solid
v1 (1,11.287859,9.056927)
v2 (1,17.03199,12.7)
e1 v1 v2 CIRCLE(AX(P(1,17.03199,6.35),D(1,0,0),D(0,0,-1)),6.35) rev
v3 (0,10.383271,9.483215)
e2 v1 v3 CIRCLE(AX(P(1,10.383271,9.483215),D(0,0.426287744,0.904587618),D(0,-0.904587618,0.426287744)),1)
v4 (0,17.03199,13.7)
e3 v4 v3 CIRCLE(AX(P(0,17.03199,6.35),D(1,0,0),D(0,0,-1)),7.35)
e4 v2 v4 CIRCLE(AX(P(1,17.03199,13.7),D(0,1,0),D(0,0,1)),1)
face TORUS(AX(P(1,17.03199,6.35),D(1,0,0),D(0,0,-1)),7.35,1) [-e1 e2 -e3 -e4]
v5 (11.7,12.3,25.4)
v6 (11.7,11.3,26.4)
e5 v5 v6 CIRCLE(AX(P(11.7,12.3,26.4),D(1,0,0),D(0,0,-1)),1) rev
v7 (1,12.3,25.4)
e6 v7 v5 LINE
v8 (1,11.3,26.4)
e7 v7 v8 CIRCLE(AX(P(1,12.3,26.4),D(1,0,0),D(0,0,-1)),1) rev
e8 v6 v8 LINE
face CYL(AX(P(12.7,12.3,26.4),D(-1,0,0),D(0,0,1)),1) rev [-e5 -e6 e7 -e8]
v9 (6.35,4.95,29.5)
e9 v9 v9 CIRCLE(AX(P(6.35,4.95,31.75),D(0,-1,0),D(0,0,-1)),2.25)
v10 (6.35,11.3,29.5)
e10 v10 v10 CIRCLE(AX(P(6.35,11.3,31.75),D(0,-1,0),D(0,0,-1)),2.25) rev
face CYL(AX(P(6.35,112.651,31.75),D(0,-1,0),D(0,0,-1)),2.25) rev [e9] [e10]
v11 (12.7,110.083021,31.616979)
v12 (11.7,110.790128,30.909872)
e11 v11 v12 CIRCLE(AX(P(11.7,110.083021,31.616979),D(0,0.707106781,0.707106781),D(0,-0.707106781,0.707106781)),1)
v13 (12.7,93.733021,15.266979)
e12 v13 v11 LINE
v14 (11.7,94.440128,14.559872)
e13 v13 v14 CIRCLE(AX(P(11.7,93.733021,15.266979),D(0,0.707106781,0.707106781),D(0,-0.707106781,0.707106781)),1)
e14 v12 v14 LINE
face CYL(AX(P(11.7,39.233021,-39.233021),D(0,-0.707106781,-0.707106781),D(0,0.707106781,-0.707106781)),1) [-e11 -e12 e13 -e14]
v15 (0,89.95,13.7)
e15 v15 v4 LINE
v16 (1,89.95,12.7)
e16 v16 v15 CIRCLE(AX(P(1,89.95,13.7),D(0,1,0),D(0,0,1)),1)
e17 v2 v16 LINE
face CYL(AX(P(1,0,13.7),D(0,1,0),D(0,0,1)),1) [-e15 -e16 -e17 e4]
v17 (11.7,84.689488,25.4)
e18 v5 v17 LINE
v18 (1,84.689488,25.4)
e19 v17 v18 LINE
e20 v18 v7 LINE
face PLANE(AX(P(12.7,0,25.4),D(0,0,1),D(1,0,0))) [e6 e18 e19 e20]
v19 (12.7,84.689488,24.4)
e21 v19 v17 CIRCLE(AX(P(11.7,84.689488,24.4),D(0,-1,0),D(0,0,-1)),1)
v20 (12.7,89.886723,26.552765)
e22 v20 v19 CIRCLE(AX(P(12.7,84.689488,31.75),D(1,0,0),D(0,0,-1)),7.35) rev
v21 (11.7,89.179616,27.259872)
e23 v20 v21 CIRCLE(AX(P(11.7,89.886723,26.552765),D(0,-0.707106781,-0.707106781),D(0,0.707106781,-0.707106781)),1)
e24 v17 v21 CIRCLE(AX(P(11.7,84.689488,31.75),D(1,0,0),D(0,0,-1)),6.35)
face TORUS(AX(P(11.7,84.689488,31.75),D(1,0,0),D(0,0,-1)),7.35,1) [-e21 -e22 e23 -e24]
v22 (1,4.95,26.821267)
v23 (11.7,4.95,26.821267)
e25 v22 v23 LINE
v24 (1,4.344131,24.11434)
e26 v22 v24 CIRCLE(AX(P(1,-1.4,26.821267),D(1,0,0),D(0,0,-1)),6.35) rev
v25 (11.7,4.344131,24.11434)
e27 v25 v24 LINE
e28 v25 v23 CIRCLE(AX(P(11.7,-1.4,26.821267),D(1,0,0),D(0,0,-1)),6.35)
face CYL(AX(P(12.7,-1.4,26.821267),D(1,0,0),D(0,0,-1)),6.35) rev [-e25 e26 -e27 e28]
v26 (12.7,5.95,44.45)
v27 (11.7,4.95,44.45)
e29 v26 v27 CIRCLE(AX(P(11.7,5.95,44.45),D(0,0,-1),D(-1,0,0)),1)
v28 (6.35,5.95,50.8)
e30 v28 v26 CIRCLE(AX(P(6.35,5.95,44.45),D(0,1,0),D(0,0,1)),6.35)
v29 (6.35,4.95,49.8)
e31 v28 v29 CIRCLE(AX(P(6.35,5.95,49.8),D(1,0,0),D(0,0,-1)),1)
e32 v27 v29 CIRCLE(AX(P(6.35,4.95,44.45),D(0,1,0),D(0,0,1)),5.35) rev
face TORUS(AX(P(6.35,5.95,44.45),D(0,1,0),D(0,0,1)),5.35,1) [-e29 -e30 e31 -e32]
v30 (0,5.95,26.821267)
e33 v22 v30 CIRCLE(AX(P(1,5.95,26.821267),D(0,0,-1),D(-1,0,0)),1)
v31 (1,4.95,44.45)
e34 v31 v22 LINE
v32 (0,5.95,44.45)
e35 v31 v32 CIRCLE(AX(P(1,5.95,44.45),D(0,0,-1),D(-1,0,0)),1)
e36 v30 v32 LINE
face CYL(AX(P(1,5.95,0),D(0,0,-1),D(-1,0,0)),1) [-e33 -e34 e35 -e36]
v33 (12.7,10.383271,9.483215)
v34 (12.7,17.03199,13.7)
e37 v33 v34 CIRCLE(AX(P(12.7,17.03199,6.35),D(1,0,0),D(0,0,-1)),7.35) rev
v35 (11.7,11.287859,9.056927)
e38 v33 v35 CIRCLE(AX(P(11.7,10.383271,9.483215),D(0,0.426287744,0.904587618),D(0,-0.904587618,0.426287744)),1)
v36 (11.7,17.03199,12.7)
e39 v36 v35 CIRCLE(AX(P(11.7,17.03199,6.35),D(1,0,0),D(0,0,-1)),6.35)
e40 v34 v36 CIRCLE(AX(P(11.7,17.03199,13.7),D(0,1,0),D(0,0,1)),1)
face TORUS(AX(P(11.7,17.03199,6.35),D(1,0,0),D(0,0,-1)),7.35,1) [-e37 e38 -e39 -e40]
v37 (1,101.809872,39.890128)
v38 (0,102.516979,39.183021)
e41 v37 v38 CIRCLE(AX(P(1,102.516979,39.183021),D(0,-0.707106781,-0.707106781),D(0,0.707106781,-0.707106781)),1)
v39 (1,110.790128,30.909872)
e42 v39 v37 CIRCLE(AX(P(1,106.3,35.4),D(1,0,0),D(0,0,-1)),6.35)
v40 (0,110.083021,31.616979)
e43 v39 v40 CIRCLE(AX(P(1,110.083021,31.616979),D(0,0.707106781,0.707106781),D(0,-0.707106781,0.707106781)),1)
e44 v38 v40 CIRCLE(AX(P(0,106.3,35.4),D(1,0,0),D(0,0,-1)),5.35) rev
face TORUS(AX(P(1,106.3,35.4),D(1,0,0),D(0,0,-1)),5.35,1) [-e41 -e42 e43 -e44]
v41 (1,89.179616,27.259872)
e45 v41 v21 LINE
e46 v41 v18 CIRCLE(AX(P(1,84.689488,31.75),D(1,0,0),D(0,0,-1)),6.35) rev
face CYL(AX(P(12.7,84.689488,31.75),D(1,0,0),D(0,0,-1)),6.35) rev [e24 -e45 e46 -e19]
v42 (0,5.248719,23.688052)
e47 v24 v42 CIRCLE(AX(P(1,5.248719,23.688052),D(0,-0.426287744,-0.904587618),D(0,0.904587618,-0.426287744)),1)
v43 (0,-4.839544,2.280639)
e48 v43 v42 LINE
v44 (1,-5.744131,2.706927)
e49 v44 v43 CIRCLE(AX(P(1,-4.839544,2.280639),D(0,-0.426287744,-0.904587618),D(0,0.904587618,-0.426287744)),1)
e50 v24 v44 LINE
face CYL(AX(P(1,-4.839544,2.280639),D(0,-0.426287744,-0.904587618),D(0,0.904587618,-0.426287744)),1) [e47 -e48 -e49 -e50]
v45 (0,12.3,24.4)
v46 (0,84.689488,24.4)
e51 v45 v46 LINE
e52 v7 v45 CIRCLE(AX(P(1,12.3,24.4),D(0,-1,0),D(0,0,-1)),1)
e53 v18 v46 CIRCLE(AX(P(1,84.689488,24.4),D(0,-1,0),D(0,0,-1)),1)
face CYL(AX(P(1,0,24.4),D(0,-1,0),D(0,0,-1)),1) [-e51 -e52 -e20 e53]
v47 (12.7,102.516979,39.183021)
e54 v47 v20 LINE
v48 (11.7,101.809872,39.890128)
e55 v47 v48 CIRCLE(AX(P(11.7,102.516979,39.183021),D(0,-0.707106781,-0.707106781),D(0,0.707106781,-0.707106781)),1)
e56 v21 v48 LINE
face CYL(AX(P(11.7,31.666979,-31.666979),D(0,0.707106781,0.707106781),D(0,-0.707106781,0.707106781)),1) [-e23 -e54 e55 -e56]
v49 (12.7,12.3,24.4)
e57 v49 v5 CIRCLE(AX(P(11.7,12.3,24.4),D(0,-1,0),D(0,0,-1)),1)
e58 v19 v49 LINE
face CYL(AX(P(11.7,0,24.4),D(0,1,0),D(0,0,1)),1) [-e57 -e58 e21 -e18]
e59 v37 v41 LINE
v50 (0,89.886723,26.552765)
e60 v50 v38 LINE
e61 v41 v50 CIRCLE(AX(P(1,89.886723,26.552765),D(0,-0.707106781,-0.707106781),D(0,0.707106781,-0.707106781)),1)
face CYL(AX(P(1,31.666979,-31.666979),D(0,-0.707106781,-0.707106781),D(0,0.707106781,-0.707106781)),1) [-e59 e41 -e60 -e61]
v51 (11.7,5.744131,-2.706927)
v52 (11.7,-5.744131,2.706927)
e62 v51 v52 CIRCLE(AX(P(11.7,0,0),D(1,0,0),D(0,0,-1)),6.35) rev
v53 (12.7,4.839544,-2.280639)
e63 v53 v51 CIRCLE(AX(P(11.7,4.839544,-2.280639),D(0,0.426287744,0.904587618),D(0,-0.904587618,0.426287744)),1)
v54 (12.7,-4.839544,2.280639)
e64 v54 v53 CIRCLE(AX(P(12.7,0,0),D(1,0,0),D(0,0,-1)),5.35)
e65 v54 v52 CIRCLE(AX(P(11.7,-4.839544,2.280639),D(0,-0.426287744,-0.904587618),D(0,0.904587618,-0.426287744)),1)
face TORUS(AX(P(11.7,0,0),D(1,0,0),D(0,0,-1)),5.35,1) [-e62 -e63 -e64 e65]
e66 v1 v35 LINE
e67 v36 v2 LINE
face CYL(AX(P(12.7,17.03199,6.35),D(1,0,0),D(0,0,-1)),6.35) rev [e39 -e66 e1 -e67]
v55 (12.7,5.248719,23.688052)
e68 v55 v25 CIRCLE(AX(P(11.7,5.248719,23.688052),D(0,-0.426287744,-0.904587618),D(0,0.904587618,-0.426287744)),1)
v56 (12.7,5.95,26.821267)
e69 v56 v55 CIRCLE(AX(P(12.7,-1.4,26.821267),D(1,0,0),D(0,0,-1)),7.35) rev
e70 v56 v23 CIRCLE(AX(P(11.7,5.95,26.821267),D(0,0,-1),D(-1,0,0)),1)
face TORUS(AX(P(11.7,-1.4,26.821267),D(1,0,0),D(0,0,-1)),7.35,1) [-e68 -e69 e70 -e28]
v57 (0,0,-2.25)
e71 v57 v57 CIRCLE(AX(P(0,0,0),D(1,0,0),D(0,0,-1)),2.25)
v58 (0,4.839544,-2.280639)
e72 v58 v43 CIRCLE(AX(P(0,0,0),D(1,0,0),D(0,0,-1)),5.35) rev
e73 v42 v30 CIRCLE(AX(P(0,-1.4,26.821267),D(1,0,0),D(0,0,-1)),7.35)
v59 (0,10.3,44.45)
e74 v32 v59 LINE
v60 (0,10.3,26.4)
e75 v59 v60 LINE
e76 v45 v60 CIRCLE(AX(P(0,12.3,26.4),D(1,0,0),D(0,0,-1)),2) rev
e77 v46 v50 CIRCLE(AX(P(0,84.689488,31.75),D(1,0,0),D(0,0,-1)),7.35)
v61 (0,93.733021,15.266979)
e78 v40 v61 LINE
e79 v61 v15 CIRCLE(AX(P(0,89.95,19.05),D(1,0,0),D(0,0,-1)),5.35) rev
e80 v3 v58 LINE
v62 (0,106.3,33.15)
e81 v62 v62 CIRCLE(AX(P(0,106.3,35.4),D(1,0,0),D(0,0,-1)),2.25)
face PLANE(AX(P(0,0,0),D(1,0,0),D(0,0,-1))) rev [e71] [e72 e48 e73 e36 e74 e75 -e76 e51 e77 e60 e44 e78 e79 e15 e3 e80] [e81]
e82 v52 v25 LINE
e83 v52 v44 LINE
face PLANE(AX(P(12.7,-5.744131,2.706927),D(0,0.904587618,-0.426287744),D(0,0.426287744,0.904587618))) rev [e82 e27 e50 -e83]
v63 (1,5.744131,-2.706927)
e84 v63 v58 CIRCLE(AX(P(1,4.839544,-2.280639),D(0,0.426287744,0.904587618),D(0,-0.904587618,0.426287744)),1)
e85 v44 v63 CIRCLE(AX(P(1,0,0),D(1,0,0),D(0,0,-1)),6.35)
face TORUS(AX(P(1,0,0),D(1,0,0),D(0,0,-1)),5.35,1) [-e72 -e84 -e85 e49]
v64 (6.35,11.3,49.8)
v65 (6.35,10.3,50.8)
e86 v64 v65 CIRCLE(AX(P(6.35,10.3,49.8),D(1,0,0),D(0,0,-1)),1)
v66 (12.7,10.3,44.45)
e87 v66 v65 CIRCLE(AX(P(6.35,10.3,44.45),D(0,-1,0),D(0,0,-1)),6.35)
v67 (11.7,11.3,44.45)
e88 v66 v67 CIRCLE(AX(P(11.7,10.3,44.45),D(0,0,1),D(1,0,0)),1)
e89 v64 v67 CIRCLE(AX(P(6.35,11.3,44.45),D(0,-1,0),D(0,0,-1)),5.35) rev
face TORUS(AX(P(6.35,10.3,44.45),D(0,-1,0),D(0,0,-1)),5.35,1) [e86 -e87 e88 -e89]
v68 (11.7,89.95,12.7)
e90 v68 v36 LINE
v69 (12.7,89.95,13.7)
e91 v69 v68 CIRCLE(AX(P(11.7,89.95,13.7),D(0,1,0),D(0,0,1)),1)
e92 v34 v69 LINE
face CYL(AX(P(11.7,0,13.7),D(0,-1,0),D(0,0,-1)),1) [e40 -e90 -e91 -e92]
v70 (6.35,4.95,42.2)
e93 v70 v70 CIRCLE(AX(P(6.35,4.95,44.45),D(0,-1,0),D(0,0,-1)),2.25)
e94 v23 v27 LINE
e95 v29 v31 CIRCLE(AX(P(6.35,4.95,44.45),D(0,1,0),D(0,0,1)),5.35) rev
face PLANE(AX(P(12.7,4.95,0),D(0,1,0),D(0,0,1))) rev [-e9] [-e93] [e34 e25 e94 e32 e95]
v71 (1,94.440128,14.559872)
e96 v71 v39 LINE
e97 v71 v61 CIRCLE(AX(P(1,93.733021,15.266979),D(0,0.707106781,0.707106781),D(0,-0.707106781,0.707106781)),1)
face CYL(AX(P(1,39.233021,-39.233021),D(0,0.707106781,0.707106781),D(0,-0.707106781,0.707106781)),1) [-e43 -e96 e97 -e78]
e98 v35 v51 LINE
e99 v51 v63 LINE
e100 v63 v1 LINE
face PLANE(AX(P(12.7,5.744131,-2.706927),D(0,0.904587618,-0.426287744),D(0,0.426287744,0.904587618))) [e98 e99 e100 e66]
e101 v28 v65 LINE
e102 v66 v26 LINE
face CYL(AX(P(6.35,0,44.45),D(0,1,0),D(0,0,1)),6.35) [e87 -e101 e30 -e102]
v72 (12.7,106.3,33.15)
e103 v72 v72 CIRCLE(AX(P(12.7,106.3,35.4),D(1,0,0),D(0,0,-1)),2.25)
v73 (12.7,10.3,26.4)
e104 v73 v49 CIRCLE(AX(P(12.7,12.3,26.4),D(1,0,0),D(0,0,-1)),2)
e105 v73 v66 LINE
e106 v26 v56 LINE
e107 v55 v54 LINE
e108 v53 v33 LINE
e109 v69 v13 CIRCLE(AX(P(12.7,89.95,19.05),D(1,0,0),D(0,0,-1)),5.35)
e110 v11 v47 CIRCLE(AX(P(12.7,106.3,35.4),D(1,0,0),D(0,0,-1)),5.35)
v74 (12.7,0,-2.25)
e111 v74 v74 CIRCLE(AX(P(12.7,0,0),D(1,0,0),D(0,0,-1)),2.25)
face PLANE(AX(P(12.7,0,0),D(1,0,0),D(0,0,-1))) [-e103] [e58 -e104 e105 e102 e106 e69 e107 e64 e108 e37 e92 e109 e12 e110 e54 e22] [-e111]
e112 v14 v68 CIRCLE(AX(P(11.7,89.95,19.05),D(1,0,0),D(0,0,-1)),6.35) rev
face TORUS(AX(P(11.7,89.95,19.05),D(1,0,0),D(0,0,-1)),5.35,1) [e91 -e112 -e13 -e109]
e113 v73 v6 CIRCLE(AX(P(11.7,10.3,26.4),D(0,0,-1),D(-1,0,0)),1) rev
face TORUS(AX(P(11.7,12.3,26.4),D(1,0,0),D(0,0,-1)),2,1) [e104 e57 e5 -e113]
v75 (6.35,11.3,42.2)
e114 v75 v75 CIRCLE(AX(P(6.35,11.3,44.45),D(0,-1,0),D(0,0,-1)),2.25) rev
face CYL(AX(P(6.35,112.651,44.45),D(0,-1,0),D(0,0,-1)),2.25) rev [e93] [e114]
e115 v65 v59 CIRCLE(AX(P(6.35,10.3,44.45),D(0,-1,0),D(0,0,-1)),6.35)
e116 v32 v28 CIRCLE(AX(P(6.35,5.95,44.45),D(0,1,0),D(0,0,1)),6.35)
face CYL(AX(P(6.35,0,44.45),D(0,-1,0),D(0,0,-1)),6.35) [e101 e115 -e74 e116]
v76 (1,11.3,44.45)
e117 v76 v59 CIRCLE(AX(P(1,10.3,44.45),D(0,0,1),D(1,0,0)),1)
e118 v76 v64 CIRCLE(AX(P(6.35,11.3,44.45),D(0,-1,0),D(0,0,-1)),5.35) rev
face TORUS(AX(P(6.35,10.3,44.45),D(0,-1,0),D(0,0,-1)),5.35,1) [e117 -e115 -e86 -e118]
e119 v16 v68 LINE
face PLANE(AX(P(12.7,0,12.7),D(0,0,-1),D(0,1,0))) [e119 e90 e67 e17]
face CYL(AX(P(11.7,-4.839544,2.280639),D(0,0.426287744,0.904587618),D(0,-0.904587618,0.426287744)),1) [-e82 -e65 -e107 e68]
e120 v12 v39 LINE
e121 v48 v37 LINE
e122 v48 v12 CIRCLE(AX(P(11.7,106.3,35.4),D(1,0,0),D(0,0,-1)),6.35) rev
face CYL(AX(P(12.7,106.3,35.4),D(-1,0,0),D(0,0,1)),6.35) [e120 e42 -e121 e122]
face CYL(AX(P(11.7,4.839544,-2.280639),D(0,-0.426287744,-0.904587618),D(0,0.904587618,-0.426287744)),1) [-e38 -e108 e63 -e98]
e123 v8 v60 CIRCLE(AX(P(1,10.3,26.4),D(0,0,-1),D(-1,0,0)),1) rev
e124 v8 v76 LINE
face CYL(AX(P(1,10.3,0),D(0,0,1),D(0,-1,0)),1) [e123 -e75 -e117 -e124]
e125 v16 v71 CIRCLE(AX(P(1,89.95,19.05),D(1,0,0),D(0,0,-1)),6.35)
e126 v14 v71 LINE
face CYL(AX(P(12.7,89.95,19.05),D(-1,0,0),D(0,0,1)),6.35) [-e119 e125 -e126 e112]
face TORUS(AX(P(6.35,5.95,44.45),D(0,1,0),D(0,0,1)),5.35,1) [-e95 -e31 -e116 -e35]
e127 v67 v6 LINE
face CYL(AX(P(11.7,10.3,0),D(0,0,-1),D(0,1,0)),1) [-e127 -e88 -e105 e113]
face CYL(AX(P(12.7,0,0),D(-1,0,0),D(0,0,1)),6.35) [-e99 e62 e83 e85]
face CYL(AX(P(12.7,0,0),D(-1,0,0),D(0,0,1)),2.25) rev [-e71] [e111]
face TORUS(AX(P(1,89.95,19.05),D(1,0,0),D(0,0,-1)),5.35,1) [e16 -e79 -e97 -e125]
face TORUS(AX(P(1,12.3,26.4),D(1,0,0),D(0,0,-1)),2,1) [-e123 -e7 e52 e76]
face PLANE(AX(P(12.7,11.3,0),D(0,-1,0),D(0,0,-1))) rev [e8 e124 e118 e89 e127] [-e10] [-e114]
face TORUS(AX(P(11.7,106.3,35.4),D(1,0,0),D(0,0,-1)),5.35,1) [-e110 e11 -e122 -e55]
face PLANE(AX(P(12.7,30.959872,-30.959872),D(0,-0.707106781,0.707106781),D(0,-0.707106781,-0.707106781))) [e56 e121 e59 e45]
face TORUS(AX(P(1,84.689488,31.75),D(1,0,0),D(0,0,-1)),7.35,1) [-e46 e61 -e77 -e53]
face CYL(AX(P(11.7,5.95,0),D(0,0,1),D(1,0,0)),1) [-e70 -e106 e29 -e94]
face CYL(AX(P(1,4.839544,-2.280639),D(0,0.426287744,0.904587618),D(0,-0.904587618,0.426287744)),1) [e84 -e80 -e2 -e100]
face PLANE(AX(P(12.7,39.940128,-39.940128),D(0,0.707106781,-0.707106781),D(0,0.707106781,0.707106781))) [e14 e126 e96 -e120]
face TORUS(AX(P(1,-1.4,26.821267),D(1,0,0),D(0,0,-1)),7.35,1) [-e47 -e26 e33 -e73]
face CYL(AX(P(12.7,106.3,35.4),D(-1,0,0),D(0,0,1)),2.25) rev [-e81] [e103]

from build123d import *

# Parameters (mm, degrees)
SKETCH1_R           = 2.25
BOSS_EXTRUDE1_DEPTH = 12.7
FILLET1_R           = 6.35
FILLET3_R           = 6.35
FILLET4_R           = 1
CUT_EXTRUDE1_REACH  = 121.755
SKETCH2_R           = 2.25


with BuildPart() as part:
    # Sketch1 → Boss-Extrude1 (new body)
    with BuildSketch(Plane(origin=(0, 0, 0), x_dir=(0, 0, -1), z_dir=(1, 0, 0))):
        with BuildLine():
            Line((-25.4, 87.319743879), (-25.4, 11.3))
            Line((-25.4, 11.3), (-50.8, 11.3))
            Line((-50.8, 11.3), (-50.8, 4.95))
            Line((-50.8, 4.95), (-25.4, 4.95))
            Line((-25.4, 4.95), (-2.706927177, -5.744131375))
            ThreePointArc((-2.706927177, -5.744131375), (5.744131375, -2.706927177), (2.706927177, 5.744131375))
            Line((2.706927177, 5.744131375), (-12.7, 13.004659934))
            Line((-12.7, 13.004659934), (-12.7, 92.580256121))
            Line((-12.7, 92.580256121), (-30.909871939, 110.790128061))
            ThreePointArc((-30.909871939, 110.790128061), (-39.890128061, 110.790128061), (-39.890128061, 101.809871939))
            Line((-39.890128061, 101.809871939), (-25.4, 87.319743879))
        make_face()
        with Locations((-35.4, 106.3)):
            Circle(SKETCH1_R, mode=Mode.SUBTRACT)
        Circle(SKETCH1_R, mode=Mode.SUBTRACT)
    extrude(amount=BOSS_EXTRUDE1_DEPTH)

    # Fillet1
    fillet1_edges = [part.edges().sort_by_distance(p)[0] for p in [
        (6.35, 4.95, 25.4),
        (6.35, 87.319743879, 25.4),
        (6.35, 92.580256121, 12.7),
        (6.35, 13.004659934, 12.7),
    ]]
    fillet(fillet1_edges, radius=FILLET1_R)

    # Fillet3
    fillet3_edges = [part.edges().sort_by_distance(p)[0] for p in [
        (0, 8.125, 50.8),
        (12.7, 8.125, 50.8),
    ]]
    fillet(fillet3_edges, radius=FILLET3_R - 0.0001)  # a hair under: the kernel refuses the full size

    # Fillet4
    fillet4_edges = [part.edges().sort_by_distance(p)[0] for p in [
        (12.7, -2.706927177, -5.744131375),
        (0, 11.3, 34.92505),
        (0, 47.994743879, 25.4),
        (0, 110.790128061, 39.890128061),
        (0, 102.615128061, 22.734871939),
        (0, -2.706927177, -5.744131375),
        (6.35, 11.3, 25.4),
        (12.7, 102.615128061, 22.734871939),
        (12.7, 110.790128061, 39.890128061),
        (0, -0.7, 13.410633407),
        (12.7, -0.7, 13.410633407),
        (12.7, 47.994743879, 25.4),
        (0, 53.490994951, 12.7),
        (12.7, 53.490994951, 12.7),
        (0, 8.515994951, 3.175),
        (12.7, 8.515994951, 3.175),
        (12.7, 11.3, 34.92505),
        (0, 95.494743879, 33.575),
        (0, 92.380039796, 13.183364969),
        (12.7, 95.494743879, 33.575),
        (12.7, 92.380039796, 13.183364969),
        (0, 4.796681944, 25.434315884),
        (12.7, 4.796681944, 25.434315884),
        (0, 13.630996486, 11.712438232),
        (12.7, 13.630996486, 11.712438232),
        (0, 87.119527553, 25.883364969),
        (12.7, 87.119527553, 25.883364969),
        (0, 4.95, 35.635683407),
        (12.7, 4.95, 35.635683407),
        (10.84015735, 4.95, 48.94015735),
        (1.85984265, 4.95, 48.94015735),
        (10.84015735, 11.3, 48.94015735),
        (1.85984265, 11.3, 48.94015735),
    ]]
    fillet(fillet4_edges, radius=FILLET4_R)

    # Sketch2 → Cut-Extrude1 (cut, up to next)
    with BuildSketch(Plane.XZ.offset(-4.95), mode=Mode.PRIVATE) as cut_extrude1_sk1:
        with Locations(Location((6.35, 31.75, 0), (0, 0, 270))):
            Circle(SKETCH2_R)
    cut_extrude1_tool1 = extrude(cut_extrude1_sk1.sketch, amount=-CUT_EXTRUDE1_REACH, mode=Mode.PRIVATE) & part.part
    # Sketch2 → Cut-Extrude1 (cut, up to next)
    with BuildSketch(Plane.XZ.offset(-4.95), mode=Mode.PRIVATE) as cut_extrude1_sk2:
        with Locations(Location((6.35, 44.45, 0), (0, 0, 270))):
            Circle(SKETCH2_R)
    cut_extrude1_tool2 = extrude(cut_extrude1_sk2.sketch, amount=-CUT_EXTRUDE1_REACH, mode=Mode.PRIVATE) & part.part
    add(cut_extrude1_tool1.solids().sort_by_distance((6.35, 4.95, 31.75))[0], mode=Mode.SUBTRACT)
    add(cut_extrude1_tool2.solids().sort_by_distance((6.35, 4.95, 44.45))[0], mode=Mode.SUBTRACT)


solid = part.part
